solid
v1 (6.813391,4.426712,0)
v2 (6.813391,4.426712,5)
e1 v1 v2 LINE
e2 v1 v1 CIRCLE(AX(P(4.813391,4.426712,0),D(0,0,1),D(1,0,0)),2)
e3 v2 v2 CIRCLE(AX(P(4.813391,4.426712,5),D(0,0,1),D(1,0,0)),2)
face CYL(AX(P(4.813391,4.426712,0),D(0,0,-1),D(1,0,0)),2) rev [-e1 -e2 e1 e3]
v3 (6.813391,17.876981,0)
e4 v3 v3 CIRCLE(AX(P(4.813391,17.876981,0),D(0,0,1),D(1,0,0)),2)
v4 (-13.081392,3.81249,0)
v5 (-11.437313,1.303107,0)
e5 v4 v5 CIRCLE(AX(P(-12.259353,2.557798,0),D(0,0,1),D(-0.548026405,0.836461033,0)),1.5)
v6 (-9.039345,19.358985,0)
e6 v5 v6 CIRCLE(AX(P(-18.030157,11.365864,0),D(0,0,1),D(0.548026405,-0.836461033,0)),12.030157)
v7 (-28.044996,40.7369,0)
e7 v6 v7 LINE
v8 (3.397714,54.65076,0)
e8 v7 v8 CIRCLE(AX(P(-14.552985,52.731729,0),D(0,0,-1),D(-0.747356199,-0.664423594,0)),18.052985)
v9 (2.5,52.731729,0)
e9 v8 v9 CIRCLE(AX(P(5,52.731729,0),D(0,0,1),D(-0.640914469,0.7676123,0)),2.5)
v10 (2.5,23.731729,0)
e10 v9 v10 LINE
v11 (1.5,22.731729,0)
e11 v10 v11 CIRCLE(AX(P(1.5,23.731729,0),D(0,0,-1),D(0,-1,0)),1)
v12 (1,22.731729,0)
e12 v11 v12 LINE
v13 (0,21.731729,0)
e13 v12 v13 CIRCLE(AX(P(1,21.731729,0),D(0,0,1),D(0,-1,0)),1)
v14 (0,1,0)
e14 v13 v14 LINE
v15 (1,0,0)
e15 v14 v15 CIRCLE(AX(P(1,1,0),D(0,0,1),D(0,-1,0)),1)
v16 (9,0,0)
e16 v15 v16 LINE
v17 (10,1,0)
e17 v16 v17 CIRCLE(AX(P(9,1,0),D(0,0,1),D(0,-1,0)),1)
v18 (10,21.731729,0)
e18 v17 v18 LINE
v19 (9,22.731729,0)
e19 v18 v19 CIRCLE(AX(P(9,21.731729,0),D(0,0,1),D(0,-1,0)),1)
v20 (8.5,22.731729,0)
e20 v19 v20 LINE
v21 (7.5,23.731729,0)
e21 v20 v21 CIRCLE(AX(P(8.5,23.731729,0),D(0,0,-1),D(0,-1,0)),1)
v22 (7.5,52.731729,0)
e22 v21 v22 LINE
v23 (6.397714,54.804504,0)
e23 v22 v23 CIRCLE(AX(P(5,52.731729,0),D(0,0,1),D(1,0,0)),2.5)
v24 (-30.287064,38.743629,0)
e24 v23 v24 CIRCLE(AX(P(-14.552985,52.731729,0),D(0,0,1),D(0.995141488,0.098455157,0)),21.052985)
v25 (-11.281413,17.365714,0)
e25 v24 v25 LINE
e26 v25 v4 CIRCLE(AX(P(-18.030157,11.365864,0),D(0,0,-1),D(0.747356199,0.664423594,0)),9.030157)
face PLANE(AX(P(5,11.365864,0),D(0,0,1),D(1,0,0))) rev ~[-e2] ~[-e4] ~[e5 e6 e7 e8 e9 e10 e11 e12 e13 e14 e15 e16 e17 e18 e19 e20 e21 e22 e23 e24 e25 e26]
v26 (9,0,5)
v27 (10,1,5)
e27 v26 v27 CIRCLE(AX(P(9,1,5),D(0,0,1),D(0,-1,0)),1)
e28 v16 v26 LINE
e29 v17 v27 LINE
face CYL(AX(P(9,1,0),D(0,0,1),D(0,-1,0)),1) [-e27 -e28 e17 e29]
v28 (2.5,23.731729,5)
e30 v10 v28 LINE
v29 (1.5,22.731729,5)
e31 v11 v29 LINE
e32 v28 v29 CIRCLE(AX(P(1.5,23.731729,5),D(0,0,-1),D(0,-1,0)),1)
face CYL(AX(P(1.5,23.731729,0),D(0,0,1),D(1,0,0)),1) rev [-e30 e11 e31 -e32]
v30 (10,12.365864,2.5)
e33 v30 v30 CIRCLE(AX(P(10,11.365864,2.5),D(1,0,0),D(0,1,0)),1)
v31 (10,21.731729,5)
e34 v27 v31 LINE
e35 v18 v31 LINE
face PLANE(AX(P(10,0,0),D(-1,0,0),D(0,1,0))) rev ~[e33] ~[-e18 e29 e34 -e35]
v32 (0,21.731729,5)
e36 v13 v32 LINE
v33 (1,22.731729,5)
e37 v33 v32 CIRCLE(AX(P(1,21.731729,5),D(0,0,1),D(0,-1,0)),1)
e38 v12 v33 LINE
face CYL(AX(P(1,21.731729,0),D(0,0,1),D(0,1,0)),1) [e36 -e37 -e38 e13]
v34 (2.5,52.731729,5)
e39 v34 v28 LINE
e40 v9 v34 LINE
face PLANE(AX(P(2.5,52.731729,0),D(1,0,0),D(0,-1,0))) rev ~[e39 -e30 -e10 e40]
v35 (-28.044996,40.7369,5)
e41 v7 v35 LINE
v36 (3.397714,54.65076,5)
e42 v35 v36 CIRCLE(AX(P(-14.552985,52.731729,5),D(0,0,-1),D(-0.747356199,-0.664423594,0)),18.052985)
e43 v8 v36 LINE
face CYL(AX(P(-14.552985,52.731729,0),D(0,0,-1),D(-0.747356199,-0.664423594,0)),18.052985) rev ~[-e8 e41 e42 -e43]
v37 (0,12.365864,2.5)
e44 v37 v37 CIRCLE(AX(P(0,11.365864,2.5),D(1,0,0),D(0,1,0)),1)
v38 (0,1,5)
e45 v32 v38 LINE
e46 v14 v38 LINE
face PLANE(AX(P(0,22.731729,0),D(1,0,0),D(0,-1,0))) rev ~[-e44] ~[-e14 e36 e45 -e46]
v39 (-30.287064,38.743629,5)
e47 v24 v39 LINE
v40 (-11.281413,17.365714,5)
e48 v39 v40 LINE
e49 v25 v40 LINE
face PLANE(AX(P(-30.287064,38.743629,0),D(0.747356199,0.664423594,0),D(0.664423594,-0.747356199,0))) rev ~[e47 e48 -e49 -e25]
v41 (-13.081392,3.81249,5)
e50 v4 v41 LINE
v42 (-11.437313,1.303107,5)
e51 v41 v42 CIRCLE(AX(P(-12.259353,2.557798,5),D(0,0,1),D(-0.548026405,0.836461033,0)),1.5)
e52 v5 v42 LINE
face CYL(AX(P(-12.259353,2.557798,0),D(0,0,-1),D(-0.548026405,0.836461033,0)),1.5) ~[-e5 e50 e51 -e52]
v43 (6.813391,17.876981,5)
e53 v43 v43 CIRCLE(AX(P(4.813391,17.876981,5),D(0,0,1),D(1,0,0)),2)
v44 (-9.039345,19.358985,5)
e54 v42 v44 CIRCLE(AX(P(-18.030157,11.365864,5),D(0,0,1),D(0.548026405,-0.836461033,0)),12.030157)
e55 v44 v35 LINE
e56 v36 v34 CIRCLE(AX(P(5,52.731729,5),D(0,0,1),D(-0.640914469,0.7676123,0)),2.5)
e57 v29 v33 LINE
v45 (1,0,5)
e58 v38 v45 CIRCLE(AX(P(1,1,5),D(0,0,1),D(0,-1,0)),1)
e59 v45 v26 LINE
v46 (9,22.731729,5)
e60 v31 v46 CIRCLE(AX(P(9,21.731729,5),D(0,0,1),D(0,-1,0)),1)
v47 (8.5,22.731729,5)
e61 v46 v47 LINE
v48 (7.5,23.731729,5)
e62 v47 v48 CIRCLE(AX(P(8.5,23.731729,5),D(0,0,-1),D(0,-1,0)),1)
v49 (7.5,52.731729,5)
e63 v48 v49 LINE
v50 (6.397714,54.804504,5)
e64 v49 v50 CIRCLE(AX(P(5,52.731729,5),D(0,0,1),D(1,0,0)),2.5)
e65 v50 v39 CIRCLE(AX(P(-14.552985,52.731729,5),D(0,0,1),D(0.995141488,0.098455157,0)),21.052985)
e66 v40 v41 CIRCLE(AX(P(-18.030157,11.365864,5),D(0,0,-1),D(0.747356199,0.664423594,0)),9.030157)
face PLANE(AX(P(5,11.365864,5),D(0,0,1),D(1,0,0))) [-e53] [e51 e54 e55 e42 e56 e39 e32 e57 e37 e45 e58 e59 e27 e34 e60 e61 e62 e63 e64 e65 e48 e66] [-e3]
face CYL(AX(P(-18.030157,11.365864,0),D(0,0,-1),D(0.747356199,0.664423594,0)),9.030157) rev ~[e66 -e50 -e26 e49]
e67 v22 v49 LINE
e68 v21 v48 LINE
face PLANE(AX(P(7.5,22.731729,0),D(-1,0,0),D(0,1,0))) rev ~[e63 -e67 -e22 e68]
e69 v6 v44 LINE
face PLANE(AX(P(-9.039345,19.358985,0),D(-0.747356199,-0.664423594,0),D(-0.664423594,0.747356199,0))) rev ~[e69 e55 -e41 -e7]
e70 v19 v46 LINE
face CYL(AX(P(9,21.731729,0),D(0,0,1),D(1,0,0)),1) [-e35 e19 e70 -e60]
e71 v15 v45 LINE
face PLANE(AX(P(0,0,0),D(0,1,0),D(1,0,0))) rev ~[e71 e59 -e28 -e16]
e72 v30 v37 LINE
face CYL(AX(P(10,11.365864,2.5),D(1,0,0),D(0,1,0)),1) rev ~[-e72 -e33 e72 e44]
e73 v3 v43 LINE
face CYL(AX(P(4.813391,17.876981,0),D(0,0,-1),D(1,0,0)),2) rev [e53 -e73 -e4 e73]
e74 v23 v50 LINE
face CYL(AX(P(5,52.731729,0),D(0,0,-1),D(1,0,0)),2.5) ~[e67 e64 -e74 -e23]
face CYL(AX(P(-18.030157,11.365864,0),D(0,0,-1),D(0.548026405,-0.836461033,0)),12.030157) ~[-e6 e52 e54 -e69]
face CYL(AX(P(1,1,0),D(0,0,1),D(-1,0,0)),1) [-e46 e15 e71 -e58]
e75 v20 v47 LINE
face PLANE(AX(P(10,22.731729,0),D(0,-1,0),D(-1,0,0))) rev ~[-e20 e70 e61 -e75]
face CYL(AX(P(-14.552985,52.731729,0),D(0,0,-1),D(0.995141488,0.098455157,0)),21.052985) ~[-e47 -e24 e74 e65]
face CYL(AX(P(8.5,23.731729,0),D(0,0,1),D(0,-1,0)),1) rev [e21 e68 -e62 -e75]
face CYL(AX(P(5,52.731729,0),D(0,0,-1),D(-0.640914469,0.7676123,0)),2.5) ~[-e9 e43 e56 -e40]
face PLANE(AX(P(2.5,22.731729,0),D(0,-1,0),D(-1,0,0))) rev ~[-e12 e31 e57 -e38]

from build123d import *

# Parameters (mm, degrees)
F0_R     = 2
F1_DEPTH = 5
F2_R     = 1
F3_R     = 1
F4_DEPTH = 10


with BuildPart() as f1:
    # F0 (on Top) → F1 (new body)
    with BuildSketch(Plane.XY):
        Polygon((0, 22.7317288518), (0, 0), (10, 0), (10, 22.7317288518), (7.5, 22.7317288518), (5, 22.7317288518), (2.5, 22.7317288518), align=None)
        with Locations((4.8133912496, 4.4267121702)):
            Circle(F0_R, mode=Mode.SUBTRACT)
        with Locations((4.8133912496, 17.8769808263)):
            Circle(F0_R, mode=Mode.SUBTRACT)
        with BuildLine():
            Line((2.5, 52.7317288518), (2.5, 22.7317288518))
            Line((2.5, 22.7317288518), (5, 22.7317288518))
            Line((5, 22.7317288518), (5, 51.2317288518))
            ThreePointArc((5, 51.2317288518), (3.9393398282, 51.67106868), (3.5, 52.7317288518))
            ThreePointArc((3.5, 52.7317288518), (3.4744103207, 53.6926062484), (3.3977138284, 54.6507596031))
            ThreePointArc((3.3977138284, 54.6507596031), (2.7355226399, 53.7910410275), (2.5, 52.7317288518))
        make_face()
        with BuildLine():
            Line((5, 22.7317288518), (7.5, 22.7317288518))
            Line((7.5, 22.7317288518), (7.5, 52.7317288518))
            ThreePointArc((7.5, 52.7317288518), (7.2072929768, 53.9055506928), (6.3977138284, 54.8045038164))
            ThreePointArc((6.3977138284, 54.8045038164), (6.4744129083, 53.7693774574), (6.5, 52.7317288518))
            ThreePointArc((6.5, 52.7317288518), (6.0606601718, 51.67106868), (5, 51.2317288518))
            Line((5, 51.2317288518), (5, 22.7317288518))
        make_face()
        with BuildLine():
            ThreePointArc((3.5, 52.7317288518), (3.9393398282, 51.67106868), (5, 51.2317288518))
            Line((5, 51.2317288518), (5, 52.7317288518))
            ThreePointArc((5, 52.7317288518), (4.960003557, 53.9817288518), (4.8401778569, 55.226614998))
            ThreePointArc((4.8401778569, 55.226614998), (4.073091813, 55.053547366), (3.3977138284, 54.6507596031))
            ThreePointArc((3.3977138284, 54.6507596031), (3.4744103207, 53.6926062484), (3.5, 52.7317288518))
        make_face()
        with BuildLine():
            Line((5, 52.7317288518), (5, 51.2317288518))
            ThreePointArc((5, 51.2317288518), (6.0606601718, 51.67106868), (6.5, 52.7317288518))
            ThreePointArc((6.5, 52.7317288518), (6.4744129083, 53.7693774574), (6.3977138284, 54.8045038164))
            ThreePointArc((6.3977138284, 54.8045038164), (5.6539406843, 55.144685872), (4.8401778569, 55.226614998))
            ThreePointArc((4.8401778569, 55.226614998), (4.960003557, 53.9817288518), (5, 52.7317288518))
        make_face()
        with BuildLine():
            ThreePointArc((-28.0449956093, 40.7368995467), (-21.8583839955, 69.2405574995), (3.3977138284, 54.6507596031))
            ThreePointArc((3.3977138284, 54.6507596031), (4.073091813, 55.053547366), (4.8401778569, 55.226614998))
            ThreePointArc((4.8401778569, 55.226614998), (-21.968116408, 70.8241322208), (-30.1189319968, 40.8987017286))
            ThreePointArc((-30.1189319968, 40.8987017286), (-29.0493590182, 41.2357199074), (-28.0449956093, 40.7368995467))
        make_face()
        with BuildLine():
            ThreePointArc((4.8401778569, 55.226614998), (5.6539406843, 55.144685872), (6.3977138284, 54.8045038164))
            ThreePointArc((6.3977138284, 54.8045038164), (-22.9963973106, 72.0173965367), (-30.2870642065, 38.7436287659))
            ThreePointArc((-30.2870642065, 38.7436287659), (-30.661485659, 39.856935046), (-30.1189319968, 40.8987017286))
            ThreePointArc((-30.1189319968, 40.8987017286), (-21.968116408, 70.8241322208), (4.8401778569, 55.226614998))
        make_face()
        with BuildLine():
            Line((-9.0393445759, 19.3589845332), (-28.0449956093, 40.7368995467))
            ThreePointArc((-28.0449956093, 40.7368995467), (-27.6686113105, 39.6523008448), (-28.1693945175, 38.6192298577))
            Line((-28.1693945175, 38.6192298577), (-11.1570142649, 19.4833834414))
            ThreePointArc((-11.1570142649, 19.4833834414), (-10.0724155629, 19.8597677402), (-9.0393445759, 19.3589845332))
        make_face()
        with BuildLine():
            ThreePointArc((-28.1693945175, 38.6192298577), (-27.6686113105, 39.6523008448), (-28.0449956093, 40.7368995467))
            ThreePointArc((-28.0449956093, 40.7368995467), (-29.0493590182, 41.2357199074), (-30.1189319968, 40.8987017286))
            ThreePointArc((-30.1189319968, 40.8987017286), (-29.6535936799, 40.3103418877), (-29.1660299079, 39.7402641563))
            Line((-29.1660299079, 39.7402641563), (-28.1693945175, 38.6192298577))
        make_face()
        with BuildLine():
            ThreePointArc((-30.1189319968, 40.8987017286), (-30.661485659, 39.856935046), (-30.2870642065, 38.7436287659))
            ThreePointArc((-30.2870642065, 38.7436287659), (-29.2539932195, 38.2428455589), (-28.1693945175, 38.6192298577))
            Line((-28.1693945175, 38.6192298577), (-29.1660299079, 39.7402641563))
            ThreePointArc((-29.1660299079, 39.7402641563), (-29.6535936799, 40.3103418877), (-30.1189319968, 40.8987017286))
        make_face()
        with BuildLine():
            ThreePointArc((-28.1693945175, 38.6192298577), (-29.2539932195, 38.2428455589), (-30.2870642065, 38.7436287659))
            Line((-30.2870642065, 38.7436287659), (-11.2814131731, 17.3657137524))
            ThreePointArc((-11.2814131731, 17.3657137524), (-11.6577974719, 18.4503124544), (-11.1570142649, 19.4833834414))
            Line((-11.1570142649, 19.4833834414), (-28.1693945175, 38.6192298577))
        make_face()
        with BuildLine():
            ThreePointArc((-11.4373132839, 1.3031069234), (-6.1047109197, 9.7820673373), (-9.0393445759, 19.3589845332))
            ThreePointArc((-9.0393445759, 19.3589845332), (-8.6670458513, 18.2210817301), (-9.2461191516, 17.1731775156))
            ThreePointArc((-9.2461191516, 17.1731775156), (-10.3016462873, 16.8690161197), (-11.2814131731, 17.3657137524))
            ThreePointArc((-11.2814131731, 17.3657137524), (-9.0785988115, 10.1770240522), (-13.0813924983, 3.8124900222))
            ThreePointArc((-13.0813924983, 3.8124900222), (-13.5140444405, 1.7357588655), (-11.4373132839, 1.3031069234))
        make_face()
        with BuildLine():
            ThreePointArc((-9.2461191516, 17.1731775156), (-8.6670458513, 18.2210817301), (-9.0393445759, 19.3589845332))
            ThreePointArc((-9.0393445759, 19.3589845332), (-10.0724155629, 19.8597677402), (-11.1570142649, 19.4833834414))
            Line((-11.1570142649, 19.4833834414), (-10.1603788745, 18.3623491428))
            ThreePointArc((-10.1603788745, 18.3623491428), (-9.6820476982, 17.7840633382), (-9.2461191516, 17.1731775156))
        make_face()
        with BuildLine():
            ThreePointArc((-11.1570142649, 19.4833834414), (-11.6577974719, 18.4503124544), (-11.2814131731, 17.3657137524))
            ThreePointArc((-11.2814131731, 17.3657137524), (-10.3016462873, 16.8690161197), (-9.2461191516, 17.1731775156))
            ThreePointArc((-9.2461191516, 17.1731775156), (-9.6820476982, 17.7840633382), (-10.1603788745, 18.3623491428))
            Line((-10.1603788745, 18.3623491428), (-11.1570142649, 19.4833834414))
        make_face()
    extrude(amount=F1_DEPTH)

    # F2
    f2_edges = [f1.edges().sort_by_distance(p)[0] for p in [
        (0, 22.731729, 2.5),
        (2.5, 22.731729, 2.5),
        (10, 22.731729, 2.5),
        (7.5, 22.731729, 2.5),
        (10, 0, 2.5),
        (0, 0, 2.5),
    ]]
    fillet(f2_edges, radius=F2_R)

    # F3 (on face) → F4 (cut, through all)
    with BuildSketch(Plane.YZ.offset(10)):
        with Locations((11.3658644259, 2.5)):
            Circle(F3_R)
    extrude(amount=-F4_DEPTH, mode=Mode.SUBTRACT)


solid = f1.part
